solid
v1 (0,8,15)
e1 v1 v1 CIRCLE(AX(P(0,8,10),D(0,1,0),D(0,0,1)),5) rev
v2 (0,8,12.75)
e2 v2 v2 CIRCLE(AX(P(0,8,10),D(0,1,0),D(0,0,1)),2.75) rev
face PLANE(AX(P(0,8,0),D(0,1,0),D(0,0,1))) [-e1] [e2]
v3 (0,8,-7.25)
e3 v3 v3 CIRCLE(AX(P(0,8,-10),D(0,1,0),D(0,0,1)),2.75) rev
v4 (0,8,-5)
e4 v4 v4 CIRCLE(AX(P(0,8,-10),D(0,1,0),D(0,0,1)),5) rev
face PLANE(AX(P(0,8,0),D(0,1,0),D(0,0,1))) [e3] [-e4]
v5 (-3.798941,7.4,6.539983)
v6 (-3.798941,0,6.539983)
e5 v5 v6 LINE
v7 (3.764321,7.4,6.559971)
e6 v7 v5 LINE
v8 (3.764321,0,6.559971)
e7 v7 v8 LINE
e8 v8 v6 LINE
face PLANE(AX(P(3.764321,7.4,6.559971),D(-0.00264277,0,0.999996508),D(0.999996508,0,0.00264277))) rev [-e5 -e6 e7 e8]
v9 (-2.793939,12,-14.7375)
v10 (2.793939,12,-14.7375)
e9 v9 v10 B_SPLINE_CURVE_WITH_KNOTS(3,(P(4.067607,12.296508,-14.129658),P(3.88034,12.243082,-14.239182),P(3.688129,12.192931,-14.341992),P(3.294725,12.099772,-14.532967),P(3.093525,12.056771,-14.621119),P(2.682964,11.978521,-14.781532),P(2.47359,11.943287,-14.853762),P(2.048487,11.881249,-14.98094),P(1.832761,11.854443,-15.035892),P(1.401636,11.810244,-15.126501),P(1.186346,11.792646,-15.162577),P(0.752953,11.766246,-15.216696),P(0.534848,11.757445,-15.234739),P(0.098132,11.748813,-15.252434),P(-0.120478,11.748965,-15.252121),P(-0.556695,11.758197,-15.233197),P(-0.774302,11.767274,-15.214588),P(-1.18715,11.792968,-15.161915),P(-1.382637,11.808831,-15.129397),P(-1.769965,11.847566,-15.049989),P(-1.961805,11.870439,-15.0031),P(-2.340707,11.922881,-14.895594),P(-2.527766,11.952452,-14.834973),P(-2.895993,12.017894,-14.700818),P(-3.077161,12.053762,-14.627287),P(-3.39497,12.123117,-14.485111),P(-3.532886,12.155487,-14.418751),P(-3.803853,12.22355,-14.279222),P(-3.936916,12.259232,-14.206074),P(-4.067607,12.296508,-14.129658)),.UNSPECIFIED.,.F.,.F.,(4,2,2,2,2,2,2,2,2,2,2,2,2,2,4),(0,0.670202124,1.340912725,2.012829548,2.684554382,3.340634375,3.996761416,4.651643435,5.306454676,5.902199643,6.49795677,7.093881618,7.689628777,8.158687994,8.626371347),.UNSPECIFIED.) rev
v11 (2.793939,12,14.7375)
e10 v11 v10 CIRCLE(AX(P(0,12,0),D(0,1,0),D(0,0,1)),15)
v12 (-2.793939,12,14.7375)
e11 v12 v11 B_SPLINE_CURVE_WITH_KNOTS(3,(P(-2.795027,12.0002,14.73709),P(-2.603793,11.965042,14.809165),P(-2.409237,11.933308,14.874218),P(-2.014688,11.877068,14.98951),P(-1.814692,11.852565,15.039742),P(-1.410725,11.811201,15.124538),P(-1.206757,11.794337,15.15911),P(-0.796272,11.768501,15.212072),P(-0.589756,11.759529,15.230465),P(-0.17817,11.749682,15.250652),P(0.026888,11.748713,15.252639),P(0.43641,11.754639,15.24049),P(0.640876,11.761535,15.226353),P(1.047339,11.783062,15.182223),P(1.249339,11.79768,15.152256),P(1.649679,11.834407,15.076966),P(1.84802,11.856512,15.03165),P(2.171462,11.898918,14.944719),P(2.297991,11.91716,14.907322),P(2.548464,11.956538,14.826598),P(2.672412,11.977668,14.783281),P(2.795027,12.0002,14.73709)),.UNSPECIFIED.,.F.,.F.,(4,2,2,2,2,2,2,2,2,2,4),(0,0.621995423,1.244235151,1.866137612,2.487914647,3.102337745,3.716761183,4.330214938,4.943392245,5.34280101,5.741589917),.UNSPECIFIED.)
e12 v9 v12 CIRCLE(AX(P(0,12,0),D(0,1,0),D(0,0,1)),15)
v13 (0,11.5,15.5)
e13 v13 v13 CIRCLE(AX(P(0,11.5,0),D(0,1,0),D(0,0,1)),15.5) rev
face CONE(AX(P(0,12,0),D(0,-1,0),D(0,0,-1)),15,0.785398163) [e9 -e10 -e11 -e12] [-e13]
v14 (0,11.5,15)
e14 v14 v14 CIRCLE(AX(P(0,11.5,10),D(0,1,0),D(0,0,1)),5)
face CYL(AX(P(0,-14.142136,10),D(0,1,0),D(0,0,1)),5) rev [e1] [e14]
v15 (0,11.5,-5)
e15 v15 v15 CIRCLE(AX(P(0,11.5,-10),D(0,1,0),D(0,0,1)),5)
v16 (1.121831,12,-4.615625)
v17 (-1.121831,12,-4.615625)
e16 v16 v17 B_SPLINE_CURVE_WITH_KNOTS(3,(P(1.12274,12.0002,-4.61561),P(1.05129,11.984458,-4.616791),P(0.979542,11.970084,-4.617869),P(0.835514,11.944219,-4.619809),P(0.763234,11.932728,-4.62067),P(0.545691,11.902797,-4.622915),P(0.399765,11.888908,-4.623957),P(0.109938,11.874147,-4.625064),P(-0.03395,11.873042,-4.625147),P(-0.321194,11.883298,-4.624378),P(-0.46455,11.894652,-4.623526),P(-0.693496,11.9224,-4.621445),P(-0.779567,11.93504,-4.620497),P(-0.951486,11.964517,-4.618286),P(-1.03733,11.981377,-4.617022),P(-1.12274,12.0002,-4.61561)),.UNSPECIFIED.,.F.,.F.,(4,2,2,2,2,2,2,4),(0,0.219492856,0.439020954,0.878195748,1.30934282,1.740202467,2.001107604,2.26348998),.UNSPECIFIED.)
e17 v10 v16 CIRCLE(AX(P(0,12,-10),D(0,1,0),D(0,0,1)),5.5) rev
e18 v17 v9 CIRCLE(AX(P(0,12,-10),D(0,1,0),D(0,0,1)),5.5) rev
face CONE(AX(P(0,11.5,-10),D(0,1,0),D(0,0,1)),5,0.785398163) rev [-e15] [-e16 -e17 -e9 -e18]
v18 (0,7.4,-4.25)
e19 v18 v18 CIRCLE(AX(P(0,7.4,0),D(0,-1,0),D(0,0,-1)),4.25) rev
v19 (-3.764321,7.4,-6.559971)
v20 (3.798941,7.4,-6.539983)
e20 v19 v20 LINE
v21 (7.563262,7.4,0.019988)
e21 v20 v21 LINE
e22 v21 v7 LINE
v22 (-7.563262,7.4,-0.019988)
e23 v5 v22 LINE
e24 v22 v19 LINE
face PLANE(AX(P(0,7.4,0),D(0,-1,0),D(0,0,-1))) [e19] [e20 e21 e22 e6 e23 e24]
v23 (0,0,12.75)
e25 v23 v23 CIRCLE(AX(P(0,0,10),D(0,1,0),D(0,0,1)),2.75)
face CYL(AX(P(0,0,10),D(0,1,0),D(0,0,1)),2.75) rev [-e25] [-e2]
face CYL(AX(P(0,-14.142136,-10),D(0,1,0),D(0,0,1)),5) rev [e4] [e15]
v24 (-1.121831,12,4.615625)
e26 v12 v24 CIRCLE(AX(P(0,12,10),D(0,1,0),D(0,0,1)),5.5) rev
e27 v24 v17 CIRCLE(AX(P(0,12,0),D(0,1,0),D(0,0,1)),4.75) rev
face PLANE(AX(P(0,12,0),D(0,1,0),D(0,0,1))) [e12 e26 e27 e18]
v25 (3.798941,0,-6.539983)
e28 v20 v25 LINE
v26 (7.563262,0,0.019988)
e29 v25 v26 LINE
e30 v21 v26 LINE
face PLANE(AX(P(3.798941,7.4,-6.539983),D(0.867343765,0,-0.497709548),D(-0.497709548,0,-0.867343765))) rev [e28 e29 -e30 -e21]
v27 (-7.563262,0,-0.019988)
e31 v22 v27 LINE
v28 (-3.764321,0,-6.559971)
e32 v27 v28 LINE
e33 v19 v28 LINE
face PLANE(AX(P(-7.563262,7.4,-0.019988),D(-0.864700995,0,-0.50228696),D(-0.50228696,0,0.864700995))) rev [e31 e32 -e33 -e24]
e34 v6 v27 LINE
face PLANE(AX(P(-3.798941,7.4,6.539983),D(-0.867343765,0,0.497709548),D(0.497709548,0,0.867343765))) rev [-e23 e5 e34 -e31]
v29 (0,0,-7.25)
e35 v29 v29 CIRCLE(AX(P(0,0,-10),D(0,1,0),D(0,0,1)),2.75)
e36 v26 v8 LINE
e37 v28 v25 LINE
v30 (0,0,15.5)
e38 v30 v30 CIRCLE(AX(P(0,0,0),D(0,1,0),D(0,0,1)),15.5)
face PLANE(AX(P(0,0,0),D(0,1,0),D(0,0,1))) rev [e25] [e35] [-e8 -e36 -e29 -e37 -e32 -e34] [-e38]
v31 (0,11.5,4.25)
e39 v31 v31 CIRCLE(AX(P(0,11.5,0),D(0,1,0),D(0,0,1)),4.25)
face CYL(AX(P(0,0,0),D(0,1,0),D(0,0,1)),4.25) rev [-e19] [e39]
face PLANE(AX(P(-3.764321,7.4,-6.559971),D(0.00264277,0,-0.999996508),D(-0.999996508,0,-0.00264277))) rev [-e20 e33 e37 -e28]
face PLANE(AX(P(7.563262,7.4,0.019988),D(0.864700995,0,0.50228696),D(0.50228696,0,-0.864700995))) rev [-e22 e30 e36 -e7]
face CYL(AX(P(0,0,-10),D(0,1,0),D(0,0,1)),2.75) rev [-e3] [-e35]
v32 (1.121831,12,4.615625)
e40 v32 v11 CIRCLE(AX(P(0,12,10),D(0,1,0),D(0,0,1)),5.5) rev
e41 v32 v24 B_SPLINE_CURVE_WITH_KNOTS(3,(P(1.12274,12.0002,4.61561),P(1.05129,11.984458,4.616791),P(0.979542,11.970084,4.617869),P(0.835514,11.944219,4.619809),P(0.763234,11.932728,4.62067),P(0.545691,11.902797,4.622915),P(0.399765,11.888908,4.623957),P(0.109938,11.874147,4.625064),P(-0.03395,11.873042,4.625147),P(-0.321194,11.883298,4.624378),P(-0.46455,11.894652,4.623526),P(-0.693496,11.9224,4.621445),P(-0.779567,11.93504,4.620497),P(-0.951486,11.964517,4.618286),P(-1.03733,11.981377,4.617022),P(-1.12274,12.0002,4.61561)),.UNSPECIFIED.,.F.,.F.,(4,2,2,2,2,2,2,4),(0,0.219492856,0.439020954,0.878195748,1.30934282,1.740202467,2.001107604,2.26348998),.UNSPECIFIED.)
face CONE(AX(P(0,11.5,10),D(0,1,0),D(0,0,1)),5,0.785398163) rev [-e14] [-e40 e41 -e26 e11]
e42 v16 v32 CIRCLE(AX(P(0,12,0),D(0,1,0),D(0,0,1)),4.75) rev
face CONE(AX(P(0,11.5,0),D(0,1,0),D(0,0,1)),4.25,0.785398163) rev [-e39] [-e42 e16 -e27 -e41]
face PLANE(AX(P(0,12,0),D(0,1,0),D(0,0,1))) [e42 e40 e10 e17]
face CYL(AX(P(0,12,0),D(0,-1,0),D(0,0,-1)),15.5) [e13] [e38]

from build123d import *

# Parameters (mm, degrees)
SKETCH1_R           = 15.5
BOSS_EXTRUDE1_DEPTH = 12
SKETCH2_R           = 2.75
CUT_EXTRUDE1_DEPTH  = 25.989997999
SKETCH3_R           = 4.25
CUT_EXTRUDE2_DEPTH  = 25.989997999
CUT_EXTRUDE3_DEPTH  = 7.4
SKETCH5_R           = 5
CUT_EXTRUDE4_DEPTH  = 4
CHAMFER1_SIZE       = 0.5


with BuildPart() as part:
    # Sketch1 → Boss-Extrude1 (new body)
    with BuildSketch(Plane(origin=(0, 0, 0), x_dir=(1, 0, 0), z_dir=(0, 1, 0))):
        with Locations(Location((0, 0, 0), (0, 0, 270))):
            Circle(SKETCH1_R)
    extrude(amount=BOSS_EXTRUDE1_DEPTH)

    # Sketch2 → Cut-Extrude1 (cut, through all)
    with BuildSketch(Plane(origin=(0, 12, 0), x_dir=(1, 0, 0), z_dir=(0, 1, 0))):
        with Locations(Location((0, 10, 0), (0, 0, 270))):
            Circle(SKETCH2_R)
        with Locations(Location((0, -10, 0), (0, 0, 270))):
            Circle(SKETCH2_R)
    extrude(amount=-CUT_EXTRUDE1_DEPTH, mode=Mode.SUBTRACT)

    # Sketch3 → Cut-Extrude2 (cut, through all)
    with BuildSketch(Plane(origin=(0, 12, 0), x_dir=(1, 0, 0), z_dir=(0, 1, 0))):
        with Locations(Location((0, 0, 0), (0, 0, 270))):
            Circle(SKETCH3_R)
    extrude(amount=-CUT_EXTRUDE2_DEPTH, mode=Mode.SUBTRACT)

    # Sketch4 → Cut-Extrude3 (cut)
    with BuildSketch(Plane.XZ):
        Polygon((3.798941201, -6.539983111), (7.563262114, 0.019988032), (3.764320914, 6.559971143), (-3.798941201, 6.539983111), (-7.563262114, -0.019988032), (-3.764320914, -6.559971143), align=None)
    extrude(amount=-CUT_EXTRUDE3_DEPTH, mode=Mode.SUBTRACT)

    # Sketch5 → Cut-Extrude4 (cut)
    with BuildSketch(Plane(origin=(0, 12, 0), x_dir=(1, 0, 0), z_dir=(0, 1, 0))):
        with Locations(Location((0, 10, 0), (0, 0, 270))):
            Circle(SKETCH5_R)
        with Locations(Location((0, -10, 0), (0, 0, 270))):
            Circle(SKETCH5_R)
    extrude(amount=-CUT_EXTRUDE4_DEPTH, mode=Mode.SUBTRACT)

    # Chamfer1
    # the kernel refuses this chamfer: 0.5 mm, written as the material it takes off along each edge
    with BuildSketch(Plane(origin=(0, 12, 0), x_dir=(0, 0, 1), z_dir=(-1, 0, 0))) as chamfer1_piece_1:
        Polygon((4.25 + CHAMFER1_SIZE, 0), (4.25, -CHAMFER1_SIZE), (4.25, 0), align=None)
    revolve(axis=Axis((0, 12, 0), (0, 1, 0)), mode=Mode.SUBTRACT)
    with BuildSketch(Plane(origin=(0, 12, 0), x_dir=(0, 0, 1), z_dir=(-1, 0, 0))) as chamfer1_piece_2:
        Polygon((15.5, -CHAMFER1_SIZE), (15.5 - CHAMFER1_SIZE, 0), (15.5, 0), align=None)
    revolve(axis=Axis((0, 12, 0), (0, 1, 0)), mode=Mode.SUBTRACT)
    with BuildSketch(Plane(origin=(0, 12, -10), x_dir=(0, 0, 1), z_dir=(-1, 0, 0))) as chamfer1_piece_3:
        Polygon((5 + CHAMFER1_SIZE, 0), (5, -CHAMFER1_SIZE), (5, 0), align=None)
    revolve(axis=Axis((0, 12, -10), (0, 1, 0)), mode=Mode.SUBTRACT)
    with BuildSketch(Plane(origin=(0, 12, 10), x_dir=(0, 0, 1), z_dir=(-1, 0, 0))) as chamfer1_piece_4:
        Polygon((5 + CHAMFER1_SIZE, 0), (5, -CHAMFER1_SIZE), (5, 0), align=None)
    revolve(axis=Axis((0, 12, 10), (0, 1, 0)), mode=Mode.SUBTRACT)


solid = part.part
